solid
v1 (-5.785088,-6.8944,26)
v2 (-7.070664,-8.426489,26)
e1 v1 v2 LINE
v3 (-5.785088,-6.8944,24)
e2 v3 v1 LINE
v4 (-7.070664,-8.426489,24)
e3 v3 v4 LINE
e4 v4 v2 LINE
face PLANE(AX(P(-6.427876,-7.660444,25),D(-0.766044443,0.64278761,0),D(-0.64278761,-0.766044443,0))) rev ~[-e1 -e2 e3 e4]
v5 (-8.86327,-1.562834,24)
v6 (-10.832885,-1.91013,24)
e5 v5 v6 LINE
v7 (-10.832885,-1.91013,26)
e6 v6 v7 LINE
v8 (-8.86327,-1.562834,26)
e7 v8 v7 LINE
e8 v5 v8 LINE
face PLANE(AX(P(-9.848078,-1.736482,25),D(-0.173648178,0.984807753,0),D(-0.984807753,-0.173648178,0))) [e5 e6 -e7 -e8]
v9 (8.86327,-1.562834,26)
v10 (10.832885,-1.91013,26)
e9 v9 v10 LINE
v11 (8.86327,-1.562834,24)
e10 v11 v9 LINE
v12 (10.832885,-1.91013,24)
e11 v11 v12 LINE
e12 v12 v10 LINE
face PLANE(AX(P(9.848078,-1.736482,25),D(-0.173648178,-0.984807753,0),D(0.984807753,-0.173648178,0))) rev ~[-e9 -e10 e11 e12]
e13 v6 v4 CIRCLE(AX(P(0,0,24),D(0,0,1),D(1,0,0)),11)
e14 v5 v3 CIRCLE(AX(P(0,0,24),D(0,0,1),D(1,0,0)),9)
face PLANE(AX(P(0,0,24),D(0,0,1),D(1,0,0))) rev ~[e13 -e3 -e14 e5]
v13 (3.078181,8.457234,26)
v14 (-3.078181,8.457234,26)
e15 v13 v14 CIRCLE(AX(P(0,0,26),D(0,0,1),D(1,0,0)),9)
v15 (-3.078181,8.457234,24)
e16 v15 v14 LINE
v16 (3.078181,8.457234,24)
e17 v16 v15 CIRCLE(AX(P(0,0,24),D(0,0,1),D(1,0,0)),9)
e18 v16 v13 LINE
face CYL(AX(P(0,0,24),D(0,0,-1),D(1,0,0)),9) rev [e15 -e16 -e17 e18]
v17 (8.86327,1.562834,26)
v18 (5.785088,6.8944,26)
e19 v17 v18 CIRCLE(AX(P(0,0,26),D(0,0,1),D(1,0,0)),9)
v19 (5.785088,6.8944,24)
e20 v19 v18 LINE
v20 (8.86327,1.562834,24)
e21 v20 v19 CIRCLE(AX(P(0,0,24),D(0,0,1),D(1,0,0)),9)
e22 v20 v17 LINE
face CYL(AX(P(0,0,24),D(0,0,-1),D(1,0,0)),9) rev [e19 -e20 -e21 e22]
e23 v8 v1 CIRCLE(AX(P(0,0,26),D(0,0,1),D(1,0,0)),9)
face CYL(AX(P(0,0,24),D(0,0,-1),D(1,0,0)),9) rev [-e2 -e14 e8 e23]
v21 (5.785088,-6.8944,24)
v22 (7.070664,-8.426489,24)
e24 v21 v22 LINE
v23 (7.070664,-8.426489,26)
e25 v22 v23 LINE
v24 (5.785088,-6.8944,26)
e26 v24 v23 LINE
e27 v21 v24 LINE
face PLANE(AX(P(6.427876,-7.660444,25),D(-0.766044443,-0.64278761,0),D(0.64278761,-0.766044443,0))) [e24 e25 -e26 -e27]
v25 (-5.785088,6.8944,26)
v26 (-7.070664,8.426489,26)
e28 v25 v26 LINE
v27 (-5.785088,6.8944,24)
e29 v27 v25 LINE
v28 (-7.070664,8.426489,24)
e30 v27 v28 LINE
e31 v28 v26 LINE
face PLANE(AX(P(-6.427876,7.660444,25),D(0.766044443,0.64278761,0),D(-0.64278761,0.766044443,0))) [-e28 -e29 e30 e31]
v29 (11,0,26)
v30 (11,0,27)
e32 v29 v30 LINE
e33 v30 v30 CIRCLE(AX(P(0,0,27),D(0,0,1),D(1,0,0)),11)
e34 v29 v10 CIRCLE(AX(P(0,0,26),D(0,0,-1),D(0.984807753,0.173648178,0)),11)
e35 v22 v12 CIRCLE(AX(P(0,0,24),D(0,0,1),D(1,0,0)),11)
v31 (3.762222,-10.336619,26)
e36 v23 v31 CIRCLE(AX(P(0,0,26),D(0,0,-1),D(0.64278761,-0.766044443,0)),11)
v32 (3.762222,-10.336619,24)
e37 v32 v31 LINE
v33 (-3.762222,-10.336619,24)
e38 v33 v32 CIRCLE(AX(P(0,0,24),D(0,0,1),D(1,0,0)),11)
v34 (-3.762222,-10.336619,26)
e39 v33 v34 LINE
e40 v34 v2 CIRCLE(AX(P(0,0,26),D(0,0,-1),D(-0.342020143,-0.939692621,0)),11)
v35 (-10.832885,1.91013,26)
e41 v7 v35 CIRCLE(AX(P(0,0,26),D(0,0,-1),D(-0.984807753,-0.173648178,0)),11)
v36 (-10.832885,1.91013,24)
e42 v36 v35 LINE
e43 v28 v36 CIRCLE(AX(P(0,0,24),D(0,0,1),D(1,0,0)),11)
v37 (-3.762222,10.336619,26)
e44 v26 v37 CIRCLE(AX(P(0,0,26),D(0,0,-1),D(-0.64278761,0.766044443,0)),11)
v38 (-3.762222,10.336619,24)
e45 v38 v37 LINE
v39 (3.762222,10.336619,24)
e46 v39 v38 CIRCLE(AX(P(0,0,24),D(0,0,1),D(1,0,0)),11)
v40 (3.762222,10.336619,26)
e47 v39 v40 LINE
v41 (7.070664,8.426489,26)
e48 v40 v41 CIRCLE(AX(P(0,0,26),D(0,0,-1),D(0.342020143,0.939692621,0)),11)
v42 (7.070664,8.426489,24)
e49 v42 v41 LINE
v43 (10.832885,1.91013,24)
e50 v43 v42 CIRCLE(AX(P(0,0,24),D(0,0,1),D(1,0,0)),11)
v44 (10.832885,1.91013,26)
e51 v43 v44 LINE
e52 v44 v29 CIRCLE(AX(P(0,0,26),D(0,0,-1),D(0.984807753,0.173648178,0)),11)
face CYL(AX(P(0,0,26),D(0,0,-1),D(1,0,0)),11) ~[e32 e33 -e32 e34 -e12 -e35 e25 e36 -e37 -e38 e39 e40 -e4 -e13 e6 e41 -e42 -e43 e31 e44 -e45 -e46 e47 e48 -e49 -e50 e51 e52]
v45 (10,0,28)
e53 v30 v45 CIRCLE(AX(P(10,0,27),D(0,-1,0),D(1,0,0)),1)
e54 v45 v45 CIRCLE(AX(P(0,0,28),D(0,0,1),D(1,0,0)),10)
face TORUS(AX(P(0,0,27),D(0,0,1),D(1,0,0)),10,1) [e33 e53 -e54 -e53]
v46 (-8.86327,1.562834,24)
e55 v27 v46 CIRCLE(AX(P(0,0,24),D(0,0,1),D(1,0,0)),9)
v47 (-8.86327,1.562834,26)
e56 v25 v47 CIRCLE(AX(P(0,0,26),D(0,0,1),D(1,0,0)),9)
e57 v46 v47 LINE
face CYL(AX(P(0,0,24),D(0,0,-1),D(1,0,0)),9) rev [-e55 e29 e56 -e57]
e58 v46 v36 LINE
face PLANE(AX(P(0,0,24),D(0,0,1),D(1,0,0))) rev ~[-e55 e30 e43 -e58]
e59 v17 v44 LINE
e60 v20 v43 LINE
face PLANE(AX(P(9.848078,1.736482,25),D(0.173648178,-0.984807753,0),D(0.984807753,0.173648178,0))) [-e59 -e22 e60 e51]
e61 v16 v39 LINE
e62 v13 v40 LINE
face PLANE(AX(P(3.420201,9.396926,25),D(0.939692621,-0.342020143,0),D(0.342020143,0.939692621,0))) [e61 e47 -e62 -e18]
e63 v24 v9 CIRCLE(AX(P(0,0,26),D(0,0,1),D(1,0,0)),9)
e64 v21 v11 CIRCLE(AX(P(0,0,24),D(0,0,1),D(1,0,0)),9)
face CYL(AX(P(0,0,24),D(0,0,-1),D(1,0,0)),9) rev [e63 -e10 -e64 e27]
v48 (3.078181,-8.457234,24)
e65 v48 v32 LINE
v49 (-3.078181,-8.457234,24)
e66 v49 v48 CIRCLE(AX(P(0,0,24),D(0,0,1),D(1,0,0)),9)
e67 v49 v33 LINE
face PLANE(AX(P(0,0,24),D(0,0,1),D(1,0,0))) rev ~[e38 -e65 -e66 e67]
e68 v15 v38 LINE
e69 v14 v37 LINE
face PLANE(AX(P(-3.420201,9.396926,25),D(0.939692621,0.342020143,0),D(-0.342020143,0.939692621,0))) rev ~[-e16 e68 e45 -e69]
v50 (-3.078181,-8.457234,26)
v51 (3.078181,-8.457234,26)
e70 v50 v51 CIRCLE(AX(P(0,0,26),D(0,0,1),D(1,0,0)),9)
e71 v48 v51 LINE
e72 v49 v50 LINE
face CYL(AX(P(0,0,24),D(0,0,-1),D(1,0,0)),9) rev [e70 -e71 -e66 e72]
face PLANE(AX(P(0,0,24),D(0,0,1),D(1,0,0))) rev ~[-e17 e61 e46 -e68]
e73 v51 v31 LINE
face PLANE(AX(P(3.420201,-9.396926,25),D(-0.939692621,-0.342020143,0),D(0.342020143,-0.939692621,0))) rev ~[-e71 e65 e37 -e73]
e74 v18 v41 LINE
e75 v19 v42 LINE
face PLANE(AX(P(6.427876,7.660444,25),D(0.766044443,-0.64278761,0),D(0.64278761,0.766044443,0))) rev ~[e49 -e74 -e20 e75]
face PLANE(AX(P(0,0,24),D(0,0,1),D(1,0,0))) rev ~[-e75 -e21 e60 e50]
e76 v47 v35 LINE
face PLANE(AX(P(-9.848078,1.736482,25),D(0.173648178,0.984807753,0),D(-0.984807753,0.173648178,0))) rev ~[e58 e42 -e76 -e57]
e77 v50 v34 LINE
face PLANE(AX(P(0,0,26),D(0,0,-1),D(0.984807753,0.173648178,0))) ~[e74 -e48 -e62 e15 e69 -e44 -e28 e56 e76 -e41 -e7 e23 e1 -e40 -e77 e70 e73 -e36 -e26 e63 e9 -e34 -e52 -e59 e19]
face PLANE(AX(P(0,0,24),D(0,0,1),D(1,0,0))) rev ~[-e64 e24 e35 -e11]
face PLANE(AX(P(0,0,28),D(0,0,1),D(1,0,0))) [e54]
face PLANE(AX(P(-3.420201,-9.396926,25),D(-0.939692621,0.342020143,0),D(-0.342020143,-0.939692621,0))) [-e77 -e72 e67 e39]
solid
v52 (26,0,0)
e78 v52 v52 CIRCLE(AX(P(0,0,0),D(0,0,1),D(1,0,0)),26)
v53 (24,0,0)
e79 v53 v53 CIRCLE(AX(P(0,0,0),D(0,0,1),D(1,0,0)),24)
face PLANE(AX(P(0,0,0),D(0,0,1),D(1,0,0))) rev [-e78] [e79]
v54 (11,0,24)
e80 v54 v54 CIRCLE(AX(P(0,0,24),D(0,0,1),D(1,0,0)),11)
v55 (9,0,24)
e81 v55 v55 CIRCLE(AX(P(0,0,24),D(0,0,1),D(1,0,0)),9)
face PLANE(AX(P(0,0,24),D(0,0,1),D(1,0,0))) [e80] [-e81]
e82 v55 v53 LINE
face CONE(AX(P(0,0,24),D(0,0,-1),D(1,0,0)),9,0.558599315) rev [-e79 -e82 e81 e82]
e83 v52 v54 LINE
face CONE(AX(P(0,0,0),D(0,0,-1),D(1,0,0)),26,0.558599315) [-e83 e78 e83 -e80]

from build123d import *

# Parameters (mm, degrees)
F3_DEPTH        = 2
F5_R            = 11
F6_DEPTH        = 2
F4_W            = 2
F4_H            = 2
F7_ANGLE_BACK   = 10
F7_ANGLE        = 20
F7_COPIES_COUNT = 6
F8_R            = 1


# Not quite as in the source:
# - a pattern or mirror of a feature is missing from the dataset's text; its kind, count and spacing are read off the source's solid


with BuildPart() as f1:
    # F0 (on Front) → F1 (revolve)
    with BuildSketch(Plane.XZ):
        Polygon((11, 24), (9, 24), (24, 0), (26, 0), align=None)
    revolve(axis=Axis((0, 0, 12), (0, 0, 1)))


with BuildPart() as f3:
    # F3 (new): a face of the model
    f3_faces = [f1.part.faces().sort_by_distance(p)[0] for p in [
        (-10.6888730163, 0, 24),
    ]]
    extrude(f3_faces, amount=F3_DEPTH)

    # F5 (on face) → F6 (join)
    with BuildSketch(Plane.XY.offset(26)):
        Circle(F5_R)
    extrude(amount=F6_DEPTH)

    # F4 (on Front) → F7 (revolve, cut)
    with BuildSketch(Plane.XZ, mode=Mode.PRIVATE) as f7_sk:
        with Locations((10, 25)):
            Rectangle(F4_W, F4_H)
    f7 = revolve(f7_sk.sketch.rotate(Axis((0, 0, 28.8), (0, 0, -1)), -F7_ANGLE_BACK), axis=Axis((0, 0, 28.8), (0, 0, -1)), revolution_arc=F7_ANGLE, mode=Mode.SUBTRACT)

    # F7_copies: F7 ×6 about axis
    f7_copies_axis = Axis((0, 0, 0), (0, 0, 1))
    for i in range(1, F7_COPIES_COUNT):
        add(f7.rotate(f7_copies_axis, i * 360 / F7_COPIES_COUNT), mode=Mode.SUBTRACT)

    # F8
    f8_edges = [f3.edges().sort_by_distance(p)[0] for p in [
        (-11, 0, 28),
    ]]
    fillet(f8_edges, radius=F8_R)


solid = Compound([f1.part, f3.part])
